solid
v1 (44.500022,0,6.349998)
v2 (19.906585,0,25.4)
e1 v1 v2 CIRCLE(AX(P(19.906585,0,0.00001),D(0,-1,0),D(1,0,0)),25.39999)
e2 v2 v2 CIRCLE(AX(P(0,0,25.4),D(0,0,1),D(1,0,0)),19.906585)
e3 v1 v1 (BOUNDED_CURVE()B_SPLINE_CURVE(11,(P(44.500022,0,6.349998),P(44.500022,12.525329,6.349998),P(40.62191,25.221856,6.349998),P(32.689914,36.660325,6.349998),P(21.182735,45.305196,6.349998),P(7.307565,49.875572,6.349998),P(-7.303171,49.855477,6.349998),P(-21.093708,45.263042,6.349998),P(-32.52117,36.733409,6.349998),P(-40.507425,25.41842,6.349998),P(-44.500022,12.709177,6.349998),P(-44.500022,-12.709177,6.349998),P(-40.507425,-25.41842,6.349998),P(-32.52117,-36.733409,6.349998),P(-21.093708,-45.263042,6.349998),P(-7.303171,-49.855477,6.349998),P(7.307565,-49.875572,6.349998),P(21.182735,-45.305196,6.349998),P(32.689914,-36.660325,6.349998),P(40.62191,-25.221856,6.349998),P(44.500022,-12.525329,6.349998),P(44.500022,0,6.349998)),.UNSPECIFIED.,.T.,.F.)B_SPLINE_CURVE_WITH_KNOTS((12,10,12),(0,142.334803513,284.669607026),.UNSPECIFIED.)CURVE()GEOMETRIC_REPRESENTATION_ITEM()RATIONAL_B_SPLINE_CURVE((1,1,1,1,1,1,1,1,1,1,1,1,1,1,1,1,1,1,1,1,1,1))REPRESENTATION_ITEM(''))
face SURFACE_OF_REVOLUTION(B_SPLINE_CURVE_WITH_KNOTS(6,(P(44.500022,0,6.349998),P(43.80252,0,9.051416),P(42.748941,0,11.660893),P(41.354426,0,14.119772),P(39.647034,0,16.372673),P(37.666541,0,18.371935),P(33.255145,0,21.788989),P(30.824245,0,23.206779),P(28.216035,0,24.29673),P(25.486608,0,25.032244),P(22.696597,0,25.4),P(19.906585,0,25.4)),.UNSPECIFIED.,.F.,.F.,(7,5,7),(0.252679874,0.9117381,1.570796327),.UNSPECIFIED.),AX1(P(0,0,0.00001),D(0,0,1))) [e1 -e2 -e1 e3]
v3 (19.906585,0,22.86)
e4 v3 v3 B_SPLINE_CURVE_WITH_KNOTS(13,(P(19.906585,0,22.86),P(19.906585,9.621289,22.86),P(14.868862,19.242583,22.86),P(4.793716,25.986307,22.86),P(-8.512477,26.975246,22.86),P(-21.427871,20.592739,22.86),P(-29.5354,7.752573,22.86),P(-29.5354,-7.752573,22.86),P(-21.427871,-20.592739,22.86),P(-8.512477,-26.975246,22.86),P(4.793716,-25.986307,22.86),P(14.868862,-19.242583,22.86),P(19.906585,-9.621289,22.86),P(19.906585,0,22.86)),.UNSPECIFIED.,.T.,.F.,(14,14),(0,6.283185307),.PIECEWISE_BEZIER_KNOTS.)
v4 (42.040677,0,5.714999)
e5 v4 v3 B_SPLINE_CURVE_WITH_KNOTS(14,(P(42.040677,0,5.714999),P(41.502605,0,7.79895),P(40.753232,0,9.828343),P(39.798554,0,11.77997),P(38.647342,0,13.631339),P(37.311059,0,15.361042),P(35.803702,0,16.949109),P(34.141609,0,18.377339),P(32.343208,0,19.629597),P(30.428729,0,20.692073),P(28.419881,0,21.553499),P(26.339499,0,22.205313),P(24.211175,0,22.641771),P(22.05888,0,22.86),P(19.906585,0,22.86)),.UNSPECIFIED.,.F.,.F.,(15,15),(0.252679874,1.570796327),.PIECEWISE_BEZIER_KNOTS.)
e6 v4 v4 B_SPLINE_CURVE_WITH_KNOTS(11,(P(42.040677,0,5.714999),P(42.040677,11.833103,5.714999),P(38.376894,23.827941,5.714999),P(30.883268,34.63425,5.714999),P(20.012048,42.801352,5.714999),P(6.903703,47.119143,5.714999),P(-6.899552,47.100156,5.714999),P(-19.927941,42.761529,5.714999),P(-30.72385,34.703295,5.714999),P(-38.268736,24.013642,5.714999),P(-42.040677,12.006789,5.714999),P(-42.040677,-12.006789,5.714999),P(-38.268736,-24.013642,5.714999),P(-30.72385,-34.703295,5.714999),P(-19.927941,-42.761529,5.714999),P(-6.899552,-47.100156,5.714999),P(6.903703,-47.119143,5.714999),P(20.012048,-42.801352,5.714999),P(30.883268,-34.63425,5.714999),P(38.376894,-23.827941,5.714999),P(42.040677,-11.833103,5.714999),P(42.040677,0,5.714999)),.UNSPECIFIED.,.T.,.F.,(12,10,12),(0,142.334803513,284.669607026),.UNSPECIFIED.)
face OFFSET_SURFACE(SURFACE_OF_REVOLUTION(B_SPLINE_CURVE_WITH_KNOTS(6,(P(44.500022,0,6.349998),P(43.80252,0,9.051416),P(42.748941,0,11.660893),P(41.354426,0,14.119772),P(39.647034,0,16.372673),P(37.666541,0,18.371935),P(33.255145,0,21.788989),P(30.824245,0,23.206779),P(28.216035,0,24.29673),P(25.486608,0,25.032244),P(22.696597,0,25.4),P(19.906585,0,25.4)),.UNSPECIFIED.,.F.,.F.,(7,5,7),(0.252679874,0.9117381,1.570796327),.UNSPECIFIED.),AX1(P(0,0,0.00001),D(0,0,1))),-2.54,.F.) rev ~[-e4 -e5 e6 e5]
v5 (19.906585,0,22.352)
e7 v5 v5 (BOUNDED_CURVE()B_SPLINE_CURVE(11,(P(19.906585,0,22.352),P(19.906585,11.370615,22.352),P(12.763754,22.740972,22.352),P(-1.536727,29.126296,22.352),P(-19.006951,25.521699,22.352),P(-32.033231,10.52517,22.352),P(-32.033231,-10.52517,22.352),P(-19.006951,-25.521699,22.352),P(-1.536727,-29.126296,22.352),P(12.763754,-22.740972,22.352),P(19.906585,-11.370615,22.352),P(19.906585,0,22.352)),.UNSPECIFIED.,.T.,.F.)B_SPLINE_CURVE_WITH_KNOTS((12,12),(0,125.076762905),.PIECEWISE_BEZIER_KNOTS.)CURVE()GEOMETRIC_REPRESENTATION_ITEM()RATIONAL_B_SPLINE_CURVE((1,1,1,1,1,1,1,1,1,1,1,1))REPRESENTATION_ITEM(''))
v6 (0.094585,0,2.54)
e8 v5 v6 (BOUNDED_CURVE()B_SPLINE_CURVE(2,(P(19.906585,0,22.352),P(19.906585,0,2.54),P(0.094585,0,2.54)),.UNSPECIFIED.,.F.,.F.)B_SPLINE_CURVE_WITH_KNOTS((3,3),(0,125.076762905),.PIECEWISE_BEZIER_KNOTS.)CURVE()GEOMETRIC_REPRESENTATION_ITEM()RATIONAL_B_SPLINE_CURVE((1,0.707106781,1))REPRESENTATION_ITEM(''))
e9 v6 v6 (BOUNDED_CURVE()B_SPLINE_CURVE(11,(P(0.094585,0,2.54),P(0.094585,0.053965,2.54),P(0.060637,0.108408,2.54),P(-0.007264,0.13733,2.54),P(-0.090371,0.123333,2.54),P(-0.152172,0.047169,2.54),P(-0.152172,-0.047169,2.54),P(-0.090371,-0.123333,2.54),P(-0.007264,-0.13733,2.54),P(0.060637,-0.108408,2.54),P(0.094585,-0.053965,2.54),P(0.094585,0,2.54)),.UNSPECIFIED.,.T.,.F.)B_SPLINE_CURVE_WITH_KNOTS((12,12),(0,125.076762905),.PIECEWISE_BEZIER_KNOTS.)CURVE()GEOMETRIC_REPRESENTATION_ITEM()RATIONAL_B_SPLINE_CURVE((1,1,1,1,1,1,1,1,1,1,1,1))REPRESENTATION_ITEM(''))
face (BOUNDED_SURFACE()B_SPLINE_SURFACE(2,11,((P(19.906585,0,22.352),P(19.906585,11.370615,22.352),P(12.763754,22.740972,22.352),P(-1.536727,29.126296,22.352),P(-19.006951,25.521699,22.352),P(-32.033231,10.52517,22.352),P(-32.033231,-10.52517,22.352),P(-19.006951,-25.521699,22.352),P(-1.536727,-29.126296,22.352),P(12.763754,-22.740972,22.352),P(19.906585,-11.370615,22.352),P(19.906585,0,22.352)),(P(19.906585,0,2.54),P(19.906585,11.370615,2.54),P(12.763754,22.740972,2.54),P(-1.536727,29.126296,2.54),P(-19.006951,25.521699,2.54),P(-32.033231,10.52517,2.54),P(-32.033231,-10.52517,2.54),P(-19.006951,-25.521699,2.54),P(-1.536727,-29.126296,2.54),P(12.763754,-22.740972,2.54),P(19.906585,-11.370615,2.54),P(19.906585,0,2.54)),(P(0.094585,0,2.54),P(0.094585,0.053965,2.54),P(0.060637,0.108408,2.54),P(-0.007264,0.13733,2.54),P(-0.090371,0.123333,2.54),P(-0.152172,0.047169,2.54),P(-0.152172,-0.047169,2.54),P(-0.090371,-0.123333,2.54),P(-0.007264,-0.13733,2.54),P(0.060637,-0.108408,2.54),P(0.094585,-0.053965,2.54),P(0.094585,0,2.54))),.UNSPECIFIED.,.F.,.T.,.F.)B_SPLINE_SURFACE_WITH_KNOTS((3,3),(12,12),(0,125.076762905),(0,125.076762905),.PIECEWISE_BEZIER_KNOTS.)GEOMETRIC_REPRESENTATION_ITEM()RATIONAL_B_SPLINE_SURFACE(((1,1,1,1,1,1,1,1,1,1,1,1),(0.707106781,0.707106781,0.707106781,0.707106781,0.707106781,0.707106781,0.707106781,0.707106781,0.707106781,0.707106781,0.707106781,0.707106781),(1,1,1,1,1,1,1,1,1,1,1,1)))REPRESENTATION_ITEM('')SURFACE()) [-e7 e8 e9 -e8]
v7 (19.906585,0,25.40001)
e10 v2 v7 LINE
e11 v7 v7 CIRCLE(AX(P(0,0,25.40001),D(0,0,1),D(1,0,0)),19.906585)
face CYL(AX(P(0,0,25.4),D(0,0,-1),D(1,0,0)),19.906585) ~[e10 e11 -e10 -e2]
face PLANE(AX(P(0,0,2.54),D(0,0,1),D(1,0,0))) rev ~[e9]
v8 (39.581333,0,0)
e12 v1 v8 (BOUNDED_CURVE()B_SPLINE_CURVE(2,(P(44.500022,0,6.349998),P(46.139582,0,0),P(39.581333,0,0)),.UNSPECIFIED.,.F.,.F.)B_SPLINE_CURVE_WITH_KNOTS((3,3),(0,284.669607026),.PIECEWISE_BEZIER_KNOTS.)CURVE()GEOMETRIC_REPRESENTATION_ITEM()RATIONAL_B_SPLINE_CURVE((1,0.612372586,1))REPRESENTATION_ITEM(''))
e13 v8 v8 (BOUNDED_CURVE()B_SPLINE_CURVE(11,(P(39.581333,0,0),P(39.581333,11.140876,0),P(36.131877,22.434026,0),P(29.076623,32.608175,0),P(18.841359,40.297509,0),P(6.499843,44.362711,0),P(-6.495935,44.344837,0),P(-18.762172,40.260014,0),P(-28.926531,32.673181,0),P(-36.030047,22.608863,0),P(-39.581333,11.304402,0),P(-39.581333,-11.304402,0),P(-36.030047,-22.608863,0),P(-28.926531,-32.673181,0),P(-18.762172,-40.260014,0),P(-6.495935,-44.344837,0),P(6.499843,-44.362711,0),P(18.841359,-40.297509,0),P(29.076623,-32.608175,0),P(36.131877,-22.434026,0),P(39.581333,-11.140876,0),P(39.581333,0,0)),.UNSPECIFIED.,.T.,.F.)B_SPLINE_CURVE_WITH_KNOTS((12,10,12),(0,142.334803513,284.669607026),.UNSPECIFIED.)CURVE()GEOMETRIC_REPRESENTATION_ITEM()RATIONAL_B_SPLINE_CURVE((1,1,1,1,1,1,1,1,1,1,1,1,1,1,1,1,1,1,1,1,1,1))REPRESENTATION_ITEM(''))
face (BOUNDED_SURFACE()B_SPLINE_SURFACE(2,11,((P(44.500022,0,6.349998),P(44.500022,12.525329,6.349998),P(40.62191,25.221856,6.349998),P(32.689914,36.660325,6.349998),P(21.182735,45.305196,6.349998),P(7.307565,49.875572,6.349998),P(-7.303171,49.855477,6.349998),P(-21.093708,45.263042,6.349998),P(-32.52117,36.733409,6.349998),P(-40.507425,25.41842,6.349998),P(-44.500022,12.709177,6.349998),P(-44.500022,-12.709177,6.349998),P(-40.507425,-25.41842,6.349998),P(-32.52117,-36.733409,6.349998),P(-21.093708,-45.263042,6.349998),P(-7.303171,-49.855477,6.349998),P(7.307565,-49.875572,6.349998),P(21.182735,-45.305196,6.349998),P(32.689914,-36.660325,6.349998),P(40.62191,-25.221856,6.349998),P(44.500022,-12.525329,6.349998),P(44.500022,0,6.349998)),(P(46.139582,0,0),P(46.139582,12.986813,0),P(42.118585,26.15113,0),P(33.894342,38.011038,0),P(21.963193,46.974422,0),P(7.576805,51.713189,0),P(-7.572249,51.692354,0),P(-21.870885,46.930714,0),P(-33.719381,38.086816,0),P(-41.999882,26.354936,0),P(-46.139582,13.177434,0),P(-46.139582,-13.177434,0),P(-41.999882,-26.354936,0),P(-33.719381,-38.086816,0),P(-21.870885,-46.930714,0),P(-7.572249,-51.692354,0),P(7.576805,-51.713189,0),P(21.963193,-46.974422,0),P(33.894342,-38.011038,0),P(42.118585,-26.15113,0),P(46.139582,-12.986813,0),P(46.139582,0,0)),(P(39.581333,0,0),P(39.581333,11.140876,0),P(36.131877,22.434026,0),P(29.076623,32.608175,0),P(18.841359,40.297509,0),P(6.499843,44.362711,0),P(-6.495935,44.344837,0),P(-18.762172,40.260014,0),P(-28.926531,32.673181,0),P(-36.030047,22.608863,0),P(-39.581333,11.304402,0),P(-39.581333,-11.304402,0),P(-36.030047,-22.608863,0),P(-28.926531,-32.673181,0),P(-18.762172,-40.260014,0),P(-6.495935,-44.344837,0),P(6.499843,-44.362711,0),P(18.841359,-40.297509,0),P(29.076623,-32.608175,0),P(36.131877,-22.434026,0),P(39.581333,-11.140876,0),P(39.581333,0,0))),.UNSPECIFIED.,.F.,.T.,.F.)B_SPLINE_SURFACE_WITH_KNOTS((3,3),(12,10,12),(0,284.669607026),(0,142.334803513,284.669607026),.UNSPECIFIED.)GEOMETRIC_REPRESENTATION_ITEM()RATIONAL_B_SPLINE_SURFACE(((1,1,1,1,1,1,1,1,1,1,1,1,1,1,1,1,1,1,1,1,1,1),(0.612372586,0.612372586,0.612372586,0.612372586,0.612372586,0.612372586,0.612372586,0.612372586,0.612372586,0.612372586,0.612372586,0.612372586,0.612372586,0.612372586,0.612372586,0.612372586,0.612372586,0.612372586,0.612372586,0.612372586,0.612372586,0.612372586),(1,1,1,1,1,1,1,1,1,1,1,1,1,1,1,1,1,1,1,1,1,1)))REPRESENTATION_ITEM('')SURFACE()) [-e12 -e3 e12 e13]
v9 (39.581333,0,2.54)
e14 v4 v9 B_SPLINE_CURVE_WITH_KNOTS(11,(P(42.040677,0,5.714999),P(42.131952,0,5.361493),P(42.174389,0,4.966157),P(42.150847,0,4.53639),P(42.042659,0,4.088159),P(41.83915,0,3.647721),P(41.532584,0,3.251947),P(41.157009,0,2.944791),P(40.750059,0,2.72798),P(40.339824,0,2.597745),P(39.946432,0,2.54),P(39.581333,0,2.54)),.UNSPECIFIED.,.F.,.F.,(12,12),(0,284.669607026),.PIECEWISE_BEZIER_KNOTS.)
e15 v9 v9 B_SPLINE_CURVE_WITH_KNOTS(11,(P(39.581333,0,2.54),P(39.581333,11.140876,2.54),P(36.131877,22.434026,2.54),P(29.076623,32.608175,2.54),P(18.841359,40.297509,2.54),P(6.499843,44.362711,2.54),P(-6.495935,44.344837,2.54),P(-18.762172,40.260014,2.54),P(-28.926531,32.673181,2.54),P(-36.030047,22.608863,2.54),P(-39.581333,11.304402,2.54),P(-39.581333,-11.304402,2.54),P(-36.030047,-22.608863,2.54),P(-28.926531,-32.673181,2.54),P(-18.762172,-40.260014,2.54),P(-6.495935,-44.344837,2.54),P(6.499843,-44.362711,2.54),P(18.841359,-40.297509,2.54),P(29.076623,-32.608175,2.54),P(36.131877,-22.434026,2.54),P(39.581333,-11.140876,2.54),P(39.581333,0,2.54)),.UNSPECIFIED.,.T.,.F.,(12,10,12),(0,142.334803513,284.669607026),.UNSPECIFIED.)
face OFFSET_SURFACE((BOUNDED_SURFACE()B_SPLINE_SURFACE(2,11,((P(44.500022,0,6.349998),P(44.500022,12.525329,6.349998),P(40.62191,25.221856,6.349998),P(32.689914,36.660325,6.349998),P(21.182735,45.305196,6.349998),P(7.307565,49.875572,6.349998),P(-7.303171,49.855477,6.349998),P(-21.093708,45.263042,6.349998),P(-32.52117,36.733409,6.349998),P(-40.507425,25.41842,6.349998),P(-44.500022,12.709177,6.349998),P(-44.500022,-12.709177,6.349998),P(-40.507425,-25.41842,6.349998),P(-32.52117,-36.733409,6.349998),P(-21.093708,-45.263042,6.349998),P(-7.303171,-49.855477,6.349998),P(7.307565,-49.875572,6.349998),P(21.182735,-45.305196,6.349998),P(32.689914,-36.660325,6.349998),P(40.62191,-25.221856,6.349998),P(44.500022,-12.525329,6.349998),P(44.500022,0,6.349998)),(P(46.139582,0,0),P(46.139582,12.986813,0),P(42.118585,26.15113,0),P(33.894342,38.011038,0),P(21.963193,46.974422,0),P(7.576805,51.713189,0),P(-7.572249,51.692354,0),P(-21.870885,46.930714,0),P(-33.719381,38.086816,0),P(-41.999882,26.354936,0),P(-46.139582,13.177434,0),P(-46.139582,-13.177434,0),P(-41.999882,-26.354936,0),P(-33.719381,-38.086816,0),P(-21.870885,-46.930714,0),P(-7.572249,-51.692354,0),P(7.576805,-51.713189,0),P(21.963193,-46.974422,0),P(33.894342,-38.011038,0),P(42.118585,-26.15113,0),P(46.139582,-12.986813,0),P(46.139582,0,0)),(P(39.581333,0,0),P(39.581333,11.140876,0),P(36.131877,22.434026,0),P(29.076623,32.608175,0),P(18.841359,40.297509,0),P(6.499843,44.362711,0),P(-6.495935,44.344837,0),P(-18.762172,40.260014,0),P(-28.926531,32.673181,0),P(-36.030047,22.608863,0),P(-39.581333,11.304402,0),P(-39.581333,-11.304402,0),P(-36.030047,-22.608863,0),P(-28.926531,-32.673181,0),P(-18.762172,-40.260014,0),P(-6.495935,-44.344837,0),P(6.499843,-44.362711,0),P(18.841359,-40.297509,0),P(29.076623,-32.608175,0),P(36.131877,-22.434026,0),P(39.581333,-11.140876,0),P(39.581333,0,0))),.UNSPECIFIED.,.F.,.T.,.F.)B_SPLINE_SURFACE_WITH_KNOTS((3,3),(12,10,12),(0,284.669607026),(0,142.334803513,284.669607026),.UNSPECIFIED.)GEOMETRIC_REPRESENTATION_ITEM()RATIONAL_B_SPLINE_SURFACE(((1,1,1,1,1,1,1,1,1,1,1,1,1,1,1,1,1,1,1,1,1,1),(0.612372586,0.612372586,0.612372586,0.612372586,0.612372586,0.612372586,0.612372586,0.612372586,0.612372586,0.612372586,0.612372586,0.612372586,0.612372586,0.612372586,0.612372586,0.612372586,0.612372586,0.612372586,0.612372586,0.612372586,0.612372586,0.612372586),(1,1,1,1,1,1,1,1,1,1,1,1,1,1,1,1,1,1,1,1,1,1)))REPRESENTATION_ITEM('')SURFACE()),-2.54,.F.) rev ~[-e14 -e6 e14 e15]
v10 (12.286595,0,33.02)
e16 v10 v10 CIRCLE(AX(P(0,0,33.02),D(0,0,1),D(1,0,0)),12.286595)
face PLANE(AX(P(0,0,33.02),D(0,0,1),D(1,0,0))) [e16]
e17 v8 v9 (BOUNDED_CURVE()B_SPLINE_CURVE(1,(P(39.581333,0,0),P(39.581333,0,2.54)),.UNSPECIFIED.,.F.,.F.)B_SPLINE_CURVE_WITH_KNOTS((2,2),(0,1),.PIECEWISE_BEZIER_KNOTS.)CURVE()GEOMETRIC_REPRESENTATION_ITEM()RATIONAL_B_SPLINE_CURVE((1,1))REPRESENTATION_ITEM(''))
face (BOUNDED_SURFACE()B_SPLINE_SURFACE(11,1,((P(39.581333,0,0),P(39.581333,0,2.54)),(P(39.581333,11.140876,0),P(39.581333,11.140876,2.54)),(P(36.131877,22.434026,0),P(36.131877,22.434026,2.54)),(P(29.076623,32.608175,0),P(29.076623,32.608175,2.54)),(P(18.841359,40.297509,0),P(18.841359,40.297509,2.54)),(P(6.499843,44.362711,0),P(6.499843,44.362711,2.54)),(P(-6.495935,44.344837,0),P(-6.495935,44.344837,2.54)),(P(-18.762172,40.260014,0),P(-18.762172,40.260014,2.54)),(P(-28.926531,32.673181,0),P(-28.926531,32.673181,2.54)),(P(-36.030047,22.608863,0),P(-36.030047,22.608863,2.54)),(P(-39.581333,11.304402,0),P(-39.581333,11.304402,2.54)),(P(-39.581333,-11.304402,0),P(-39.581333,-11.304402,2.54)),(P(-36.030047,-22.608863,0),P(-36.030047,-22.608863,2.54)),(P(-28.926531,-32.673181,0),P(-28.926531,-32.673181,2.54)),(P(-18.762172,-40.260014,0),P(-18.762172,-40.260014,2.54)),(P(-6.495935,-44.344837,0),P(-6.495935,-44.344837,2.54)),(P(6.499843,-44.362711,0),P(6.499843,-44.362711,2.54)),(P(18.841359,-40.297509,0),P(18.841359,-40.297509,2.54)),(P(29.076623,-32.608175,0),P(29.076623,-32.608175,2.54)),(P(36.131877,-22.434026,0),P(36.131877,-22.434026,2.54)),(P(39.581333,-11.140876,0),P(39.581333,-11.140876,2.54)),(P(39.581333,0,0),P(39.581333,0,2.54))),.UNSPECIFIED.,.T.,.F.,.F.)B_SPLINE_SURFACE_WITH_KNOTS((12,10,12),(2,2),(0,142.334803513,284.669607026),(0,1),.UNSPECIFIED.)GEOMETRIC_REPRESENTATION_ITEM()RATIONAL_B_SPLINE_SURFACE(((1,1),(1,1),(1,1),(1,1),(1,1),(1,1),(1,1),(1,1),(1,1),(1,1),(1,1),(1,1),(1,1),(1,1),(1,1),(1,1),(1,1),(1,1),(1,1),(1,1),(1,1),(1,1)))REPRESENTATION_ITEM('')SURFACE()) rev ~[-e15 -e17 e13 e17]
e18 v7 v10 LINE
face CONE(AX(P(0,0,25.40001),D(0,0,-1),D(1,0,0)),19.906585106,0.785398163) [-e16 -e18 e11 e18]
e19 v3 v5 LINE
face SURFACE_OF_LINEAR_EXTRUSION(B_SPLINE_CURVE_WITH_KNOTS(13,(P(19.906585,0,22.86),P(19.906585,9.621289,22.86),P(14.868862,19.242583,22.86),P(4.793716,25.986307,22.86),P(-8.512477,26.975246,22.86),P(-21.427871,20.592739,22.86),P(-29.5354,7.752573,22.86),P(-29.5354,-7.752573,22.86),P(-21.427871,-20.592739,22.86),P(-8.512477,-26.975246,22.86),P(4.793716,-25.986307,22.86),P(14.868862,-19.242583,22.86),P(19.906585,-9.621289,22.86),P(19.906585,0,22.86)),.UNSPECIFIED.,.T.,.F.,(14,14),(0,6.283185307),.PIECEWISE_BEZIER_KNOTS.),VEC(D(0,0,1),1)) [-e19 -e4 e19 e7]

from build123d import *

# Parameters (mm, degrees)
F0_R     = 45.3065751062
F1_DEPTH = 25.4
F2_R     = 25.39999
F3_R     = 5.08
F4_T     = 2.54
F5_DEPTH = 7.62
F6_SIZE  = 7.61999
F7_DEPTH = 20.32
F8_R     = 19.812


# Not quite as in the source:
# - a fillet or chamfer is up to 0.001 mm smaller than in the source, because OpenCascade refuses the exact size
# - a shell that OpenCascade refuses in one call is made with other operations: the cavity is built on its own and cut out


with BuildPart() as f1:
    # F0 (on Top) → F1 (new body)
    with BuildSketch(Plane.XY):
        Circle(F0_R)
    extrude(amount=F1_DEPTH)

    # F2 (radius 25.4 in the source; OpenCascade refuses exactly that, so slightly less here)
    f2_edges = [f1.edges().sort_by_distance(p)[0] for p in [
        (-45.306575, 0, 25.4),
    ]]
    fillet(f2_edges, radius=F2_R)

    # F3
    f3_edges = [f1.edges().sort_by_distance(p)[0] for p in [
        (-45.306575, 0, 0),
    ]]
    fillet(f3_edges, radius=F3_R)

    # F4: shell of thickness 2.54, made by hand


with BuildPart() as f4_core1:
    # F4_t2: copy of F1
    add(f1.part)

    # the walls: a layer under each face that stays
    f4_faces = [f4_core1.faces().sort_by_distance(p)[0] for p in [
        (-35.4608426764, 0, 20.0804622717),
        (-43.5974247944, 0, 1.9691472612),
        (0, 0, 25.4),
    ]]
    thicken(f4_faces, amount=-F4_T, mode=Mode.SUBTRACT)


with BuildPart() as f1_1:
    add(f1.part)

    # what is left inside the walls is the cavity
    f4_cavity = [f4_core1.part.solids().sort_by_distance(p)[0] for p in [
        (-37.487808, 0, 14.571183),
    ]]
    add(f4_cavity, mode=Mode.SUBTRACT)

    # F5 (add): a face of the model
    f5_faces = [f1_1.faces().sort_by_distance(p)[0] for p in [
        (0, 0, 25.4),
    ]]
    extrude(f5_faces, amount=F5_DEPTH)

    # F6 (size 7.62 in the source; OpenCascade refuses exactly that, so slightly less here)
    f6_edges = [f1_1.edges().sort_by_distance(p)[0] for p in [
        (-19.906585, 0, 33.02),
    ]]
    chamfer(f6_edges, length=F6_SIZE)

    # F7 (add): a face of the model
    f7_faces = [f1_1.faces().sort_by_distance(p)[0] for p in [
        (-4.79e-08, 0, 22.86),
    ]]
    extrude(f7_faces, amount=F7_DEPTH)

    # F8
    f8_edges = [f1_1.edges().sort_by_distance(p)[0] for p in [
        (-19.906585, 0, 2.54),
    ]]
    fillet(f8_edges, radius=F8_R)


solid = f1_1.part
